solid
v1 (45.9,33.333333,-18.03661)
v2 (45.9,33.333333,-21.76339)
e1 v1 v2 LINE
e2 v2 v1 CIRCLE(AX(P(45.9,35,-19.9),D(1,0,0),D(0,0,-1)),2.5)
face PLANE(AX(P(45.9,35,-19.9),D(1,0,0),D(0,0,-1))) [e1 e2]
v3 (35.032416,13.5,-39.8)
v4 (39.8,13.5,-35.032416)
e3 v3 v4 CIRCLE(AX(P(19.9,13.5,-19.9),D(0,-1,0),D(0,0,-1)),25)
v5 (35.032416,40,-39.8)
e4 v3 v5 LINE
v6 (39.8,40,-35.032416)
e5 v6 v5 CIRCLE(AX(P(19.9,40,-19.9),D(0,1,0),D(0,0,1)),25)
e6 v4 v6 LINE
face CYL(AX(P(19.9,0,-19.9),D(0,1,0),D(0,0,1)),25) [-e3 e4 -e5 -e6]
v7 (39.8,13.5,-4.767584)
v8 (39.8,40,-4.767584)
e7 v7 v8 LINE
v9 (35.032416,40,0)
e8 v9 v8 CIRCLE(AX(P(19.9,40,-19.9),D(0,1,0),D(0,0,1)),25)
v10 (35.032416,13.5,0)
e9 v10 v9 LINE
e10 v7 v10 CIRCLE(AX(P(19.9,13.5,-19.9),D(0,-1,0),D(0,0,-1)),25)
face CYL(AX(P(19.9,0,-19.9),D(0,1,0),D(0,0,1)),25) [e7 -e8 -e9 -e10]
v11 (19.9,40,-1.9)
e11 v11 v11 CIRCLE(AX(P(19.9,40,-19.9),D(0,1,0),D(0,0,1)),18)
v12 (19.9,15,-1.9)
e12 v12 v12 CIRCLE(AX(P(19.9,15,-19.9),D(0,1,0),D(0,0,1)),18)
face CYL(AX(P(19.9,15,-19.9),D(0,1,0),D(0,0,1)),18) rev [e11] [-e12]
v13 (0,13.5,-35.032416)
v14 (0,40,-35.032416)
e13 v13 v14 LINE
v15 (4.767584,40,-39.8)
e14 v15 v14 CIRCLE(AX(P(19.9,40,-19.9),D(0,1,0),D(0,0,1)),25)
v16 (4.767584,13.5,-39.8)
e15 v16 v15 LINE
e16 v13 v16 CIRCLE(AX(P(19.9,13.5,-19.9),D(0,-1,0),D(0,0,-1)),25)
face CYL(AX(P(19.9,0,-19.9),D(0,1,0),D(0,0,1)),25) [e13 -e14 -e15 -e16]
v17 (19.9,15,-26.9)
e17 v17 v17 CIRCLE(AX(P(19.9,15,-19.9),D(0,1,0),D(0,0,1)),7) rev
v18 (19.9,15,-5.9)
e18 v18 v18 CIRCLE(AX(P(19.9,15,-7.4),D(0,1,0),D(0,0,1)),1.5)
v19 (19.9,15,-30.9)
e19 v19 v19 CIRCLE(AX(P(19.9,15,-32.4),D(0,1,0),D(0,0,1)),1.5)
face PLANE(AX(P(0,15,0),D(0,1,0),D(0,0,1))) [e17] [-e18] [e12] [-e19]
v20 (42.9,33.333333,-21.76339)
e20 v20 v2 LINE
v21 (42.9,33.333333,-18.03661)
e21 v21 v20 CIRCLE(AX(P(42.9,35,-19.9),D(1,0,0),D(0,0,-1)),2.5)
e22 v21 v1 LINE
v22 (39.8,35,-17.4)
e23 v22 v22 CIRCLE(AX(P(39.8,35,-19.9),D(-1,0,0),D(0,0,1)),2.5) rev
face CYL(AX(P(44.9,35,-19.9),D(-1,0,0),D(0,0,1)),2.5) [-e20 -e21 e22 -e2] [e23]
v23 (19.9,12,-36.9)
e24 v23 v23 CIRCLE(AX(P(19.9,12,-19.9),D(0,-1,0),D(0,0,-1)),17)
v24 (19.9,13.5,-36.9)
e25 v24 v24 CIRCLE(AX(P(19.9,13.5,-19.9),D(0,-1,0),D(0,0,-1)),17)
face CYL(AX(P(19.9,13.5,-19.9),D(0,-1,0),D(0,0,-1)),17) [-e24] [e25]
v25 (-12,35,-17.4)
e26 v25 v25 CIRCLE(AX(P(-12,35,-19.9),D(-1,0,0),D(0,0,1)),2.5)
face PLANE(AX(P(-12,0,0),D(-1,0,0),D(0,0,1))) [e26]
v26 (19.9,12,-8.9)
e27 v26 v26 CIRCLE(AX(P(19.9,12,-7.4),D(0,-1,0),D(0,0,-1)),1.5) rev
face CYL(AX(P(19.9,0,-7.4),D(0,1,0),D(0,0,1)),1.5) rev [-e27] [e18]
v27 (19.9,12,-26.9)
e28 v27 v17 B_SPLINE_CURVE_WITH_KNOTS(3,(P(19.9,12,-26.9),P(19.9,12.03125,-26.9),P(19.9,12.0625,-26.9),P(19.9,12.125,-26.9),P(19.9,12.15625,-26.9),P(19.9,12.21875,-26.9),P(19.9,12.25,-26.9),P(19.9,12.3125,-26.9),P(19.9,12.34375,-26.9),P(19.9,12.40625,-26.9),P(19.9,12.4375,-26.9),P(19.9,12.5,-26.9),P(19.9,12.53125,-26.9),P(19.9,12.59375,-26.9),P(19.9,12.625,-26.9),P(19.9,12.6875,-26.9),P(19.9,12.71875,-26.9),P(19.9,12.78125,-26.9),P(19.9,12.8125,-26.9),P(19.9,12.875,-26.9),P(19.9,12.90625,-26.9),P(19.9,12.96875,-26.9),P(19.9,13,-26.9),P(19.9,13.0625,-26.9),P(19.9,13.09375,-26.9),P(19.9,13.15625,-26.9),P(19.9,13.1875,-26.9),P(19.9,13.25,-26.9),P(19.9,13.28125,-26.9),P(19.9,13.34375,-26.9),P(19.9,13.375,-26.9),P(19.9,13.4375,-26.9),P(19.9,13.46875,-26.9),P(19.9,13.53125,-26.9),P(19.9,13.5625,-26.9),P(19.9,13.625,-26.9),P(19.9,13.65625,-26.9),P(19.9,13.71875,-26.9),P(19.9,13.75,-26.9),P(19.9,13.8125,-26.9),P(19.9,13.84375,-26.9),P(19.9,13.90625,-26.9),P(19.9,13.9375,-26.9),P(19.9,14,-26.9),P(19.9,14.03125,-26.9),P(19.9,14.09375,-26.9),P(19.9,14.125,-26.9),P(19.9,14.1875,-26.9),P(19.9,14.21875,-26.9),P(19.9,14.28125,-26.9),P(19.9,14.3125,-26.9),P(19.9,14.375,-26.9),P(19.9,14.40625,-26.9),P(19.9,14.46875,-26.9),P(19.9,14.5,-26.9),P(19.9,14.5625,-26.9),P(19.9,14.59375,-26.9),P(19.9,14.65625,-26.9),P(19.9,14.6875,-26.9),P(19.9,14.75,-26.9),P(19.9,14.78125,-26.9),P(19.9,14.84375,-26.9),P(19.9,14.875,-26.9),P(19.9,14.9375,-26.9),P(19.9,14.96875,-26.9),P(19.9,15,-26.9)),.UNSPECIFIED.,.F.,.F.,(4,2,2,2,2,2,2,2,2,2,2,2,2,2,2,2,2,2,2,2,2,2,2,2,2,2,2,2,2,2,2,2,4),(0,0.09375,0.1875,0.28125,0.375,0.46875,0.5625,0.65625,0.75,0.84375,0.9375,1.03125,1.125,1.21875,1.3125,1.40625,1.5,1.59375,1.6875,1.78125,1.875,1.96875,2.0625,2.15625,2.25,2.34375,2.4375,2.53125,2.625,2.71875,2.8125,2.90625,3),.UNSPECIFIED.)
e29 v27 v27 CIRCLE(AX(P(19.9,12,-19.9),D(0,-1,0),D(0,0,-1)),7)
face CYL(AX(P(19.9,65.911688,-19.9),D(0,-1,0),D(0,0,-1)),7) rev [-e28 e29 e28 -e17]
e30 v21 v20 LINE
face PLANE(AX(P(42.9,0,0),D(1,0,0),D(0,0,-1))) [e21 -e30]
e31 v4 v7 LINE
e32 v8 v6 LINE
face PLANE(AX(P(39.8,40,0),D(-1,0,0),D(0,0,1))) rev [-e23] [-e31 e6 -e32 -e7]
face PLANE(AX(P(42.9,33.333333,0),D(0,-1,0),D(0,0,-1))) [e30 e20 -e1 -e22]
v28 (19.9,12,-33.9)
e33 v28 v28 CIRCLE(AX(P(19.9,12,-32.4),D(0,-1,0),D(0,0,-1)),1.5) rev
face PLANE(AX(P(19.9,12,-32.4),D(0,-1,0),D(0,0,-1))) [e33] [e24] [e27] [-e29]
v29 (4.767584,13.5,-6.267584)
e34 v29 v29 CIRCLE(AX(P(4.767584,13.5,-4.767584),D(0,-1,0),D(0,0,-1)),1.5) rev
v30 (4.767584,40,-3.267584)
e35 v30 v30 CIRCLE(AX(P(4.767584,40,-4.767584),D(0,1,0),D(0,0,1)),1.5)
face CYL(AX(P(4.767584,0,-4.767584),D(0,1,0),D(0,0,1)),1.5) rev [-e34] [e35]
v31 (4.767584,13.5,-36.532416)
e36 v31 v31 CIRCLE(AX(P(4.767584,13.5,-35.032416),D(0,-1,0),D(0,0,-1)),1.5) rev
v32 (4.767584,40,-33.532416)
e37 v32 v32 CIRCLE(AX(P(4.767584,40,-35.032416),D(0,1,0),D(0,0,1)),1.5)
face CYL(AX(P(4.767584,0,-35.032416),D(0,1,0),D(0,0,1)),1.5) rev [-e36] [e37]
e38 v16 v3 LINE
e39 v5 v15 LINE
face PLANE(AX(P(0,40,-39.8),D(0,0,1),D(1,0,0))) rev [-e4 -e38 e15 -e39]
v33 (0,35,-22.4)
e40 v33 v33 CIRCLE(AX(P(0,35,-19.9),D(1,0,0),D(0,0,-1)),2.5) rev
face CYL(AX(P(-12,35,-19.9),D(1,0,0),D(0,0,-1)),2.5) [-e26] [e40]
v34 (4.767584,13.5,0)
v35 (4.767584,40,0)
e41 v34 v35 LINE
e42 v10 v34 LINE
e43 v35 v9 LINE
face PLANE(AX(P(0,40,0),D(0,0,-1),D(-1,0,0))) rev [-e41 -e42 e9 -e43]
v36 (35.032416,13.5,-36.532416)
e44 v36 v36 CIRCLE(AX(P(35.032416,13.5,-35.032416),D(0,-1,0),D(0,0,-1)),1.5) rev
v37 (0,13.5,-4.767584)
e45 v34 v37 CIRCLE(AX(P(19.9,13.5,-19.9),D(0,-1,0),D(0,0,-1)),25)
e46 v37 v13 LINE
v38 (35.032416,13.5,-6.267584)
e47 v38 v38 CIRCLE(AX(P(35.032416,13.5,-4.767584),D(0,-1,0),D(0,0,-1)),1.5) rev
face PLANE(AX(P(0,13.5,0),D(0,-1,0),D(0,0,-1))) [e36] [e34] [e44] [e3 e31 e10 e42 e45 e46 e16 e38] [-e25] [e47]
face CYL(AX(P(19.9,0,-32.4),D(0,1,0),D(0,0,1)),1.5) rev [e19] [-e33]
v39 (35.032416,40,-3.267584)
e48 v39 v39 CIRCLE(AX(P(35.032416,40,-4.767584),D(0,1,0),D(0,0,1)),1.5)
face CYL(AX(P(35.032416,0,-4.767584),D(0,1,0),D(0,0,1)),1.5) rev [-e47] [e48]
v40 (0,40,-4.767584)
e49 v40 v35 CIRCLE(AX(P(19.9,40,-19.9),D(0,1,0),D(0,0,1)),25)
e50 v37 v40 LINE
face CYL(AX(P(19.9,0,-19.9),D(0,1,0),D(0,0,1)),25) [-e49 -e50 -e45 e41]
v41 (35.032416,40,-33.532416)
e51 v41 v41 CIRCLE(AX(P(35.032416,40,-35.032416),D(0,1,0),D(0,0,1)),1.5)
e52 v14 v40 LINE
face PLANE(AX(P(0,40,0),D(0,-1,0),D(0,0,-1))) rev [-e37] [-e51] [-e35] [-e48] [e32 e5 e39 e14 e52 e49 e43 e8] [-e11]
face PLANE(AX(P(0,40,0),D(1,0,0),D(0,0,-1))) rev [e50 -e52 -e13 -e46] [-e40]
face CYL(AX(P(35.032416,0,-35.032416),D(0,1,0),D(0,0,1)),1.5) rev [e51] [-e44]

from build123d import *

# Parameters (mm, degrees)
SKETCH1_W                = 39.8
SKETCH1_H                = 39.8
BOSS_EXTRUDE1_DEPTH      = 40
CUT_EXTRUDE1_DEPTH       = 25
SKETCH3_R                = 6.5
CUT_EXTRUDE2_DEPTH       = 4.5
CUT_EXTRUDE3_DEPTH       = 64.547856
CUT_EXTRUDE3_DEPTH_BACK  = 64.547856
SKETCH4_R                = 1.585
CUT_EXTRUDE4_DEPTH       = 62.587986
CUT_EXTRUDE4_DEPTH_BACK  = 62.587986
SKETCH5_R                = 1.5
SKETCH6_R                = 2.5
BOSS_EXTRUDE2_DEPTH      = 12
BOSS_EXTRUDE3_START      = 5.1
SKETCH7_R                = 2.5
BOSS_EXTRUDE3_DEPTH      = 5.1
CUT_EXTRUDE5_DEPTH       = 73.111372
CUT_EXTRUDE6_DEPTH       = 73.111372
BOSS_EXTRUDE4_START      = 1
SKETCH10_R               = 2.5
BOSS_EXTRUDE4_DEPTH      = 1
SKETCH11_R               = 6.5
CUT_EXTRUDE7_DEPTH       = 68.535916
CUT_EXTRUDE8_START       = -12
CUT_EXTRUDE8_DEPTH       = 12
CUT_EXTRUDE9_START       = -3
SKETCH13_R               = 1.5
CUT_EXTRUDE9_DEPTH       = 3
BOSS_EXTRUDE5_DEPTH      = 1
CUT_EXTRUDE10_DEPTH      = 67.89432
CUT_EXTRUDE10_DEPTH_BACK = 67.89432
SKETCH15_R               = 1.5
CUT_EXTRUDE11_START      = -4
CUT_EXTRUDE11_DEPTH      = 4
CUT_EXTRUDE12_START      = -1
CUT_EXTRUDE12_DEPTH      = 1
BOSS_EXTRUDE6_DEPTH      = 3
BOSS_EXTRUDE7_START      = -3
BOSS_EXTRUDE7_OUTLINE_R  = 7
BOSS_EXTRUDE7_DEPTH      = 3
SKETCH20_R               = 1.5
CUT_EXTRUDE13_DEPTH      = 67.89432
CUT_EXTRUDE14_START      = -3
CUT_EXTRUDE14_DEPTH      = 3
CUT_EXTRUDE16_START      = -1.5
SKETCH22_R               = 17
SKETCH22_R_2             = 1.5
CUT_EXTRUDE16_DEPTH      = 1.5


# Read off the part's stored shape, not the designer's step: Cut-Extrude11, Boss-Extrude7, Cut-Extrude14
with BuildPart() as part:
    # Sketch1 → Boss-Extrude1 (new body)
    with BuildSketch(Plane(origin=(0, 0, 0), x_dir=(1, 0, 0), z_dir=(0, 1, 0))):
        with Locations((19.9, 19.9)):
            Rectangle(SKETCH1_W, SKETCH1_H)
    extrude(amount=BOSS_EXTRUDE1_DEPTH)

    # Sketch2 → Cut-Extrude1 (cut)
    with BuildSketch(Plane(origin=(0, 40, 0), x_dir=(1, 0, 0), z_dir=(0, 1, 0))):
        with BuildLine():
            ThreePointArc((37.9, 19.9), (32.627922, 32.627922), (19.9, 37.9))
            Line((19.9, 37.9), (19.9, 19.9))
            Line((19.9, 19.9), (37.9, 19.9))
        make_face()
        with BuildLine():
            Line((19.9, 19.9), (19.9, 37.9))
            ThreePointArc((19.9, 37.9), (7.172078, 32.627922), (1.9, 19.9))
            Line((1.9, 19.9), (19.9, 19.9))
        make_face()
        with BuildLine():
            Line((37.9, 19.9), (19.9, 19.9))
            Line((19.9, 19.9), (19.9, 1.9))
            ThreePointArc((19.9, 1.9), (32.627922, 7.172078), (37.9, 19.9))
        make_face()
        with BuildLine():
            Line((19.9, 1.9), (19.9, 19.9))
            Line((19.9, 19.9), (1.9, 19.9))
            ThreePointArc((1.9, 19.9), (7.172078, 7.172078), (19.9, 1.9))
        make_face()
        with BuildLine():
            ThreePointArc((37.9, 19.9), (32.627922, 32.627922), (19.9, 37.9))
            Line((19.9, 37.9), (19.9, 19.9))
            Line((19.9, 19.9), (37.9, 19.9))
        make_face()
        with BuildLine():
            Line((19.9, 19.9), (19.9, 37.9))
            ThreePointArc((19.9, 37.9), (7.172078, 32.627922), (1.9, 19.9))
            Line((1.9, 19.9), (19.9, 19.9))
        make_face()
        with BuildLine():
            Line((37.9, 19.9), (19.9, 19.9))
            Line((19.9, 19.9), (19.9, 1.9))
            ThreePointArc((19.9, 1.9), (32.627922, 7.172078), (37.9, 19.9))
        make_face()
        with BuildLine():
            Line((19.9, 1.9), (19.9, 19.9))
            Line((19.9, 19.9), (1.9, 19.9))
            ThreePointArc((1.9, 19.9), (7.172078, 7.172078), (19.9, 1.9))
        make_face()
        with BuildLine():
            ThreePointArc((37.9, 19.9), (32.627922, 32.627922), (19.9, 37.9))
            Line((19.9, 37.9), (19.9, 19.9))
            Line((19.9, 19.9), (37.9, 19.9))
        make_face()
        with BuildLine():
            Line((19.9, 19.9), (19.9, 37.9))
            ThreePointArc((19.9, 37.9), (7.172078, 32.627922), (1.9, 19.9))
            Line((1.9, 19.9), (19.9, 19.9))
        make_face()
        with BuildLine():
            Line((37.9, 19.9), (19.9, 19.9))
            Line((19.9, 19.9), (19.9, 1.9))
            ThreePointArc((19.9, 1.9), (32.627922, 7.172078), (37.9, 19.9))
        make_face()
        with BuildLine():
            Line((19.9, 1.9), (19.9, 19.9))
            Line((19.9, 19.9), (1.9, 19.9))
            ThreePointArc((1.9, 19.9), (7.172078, 7.172078), (19.9, 1.9))
        make_face()
        with BuildLine():
            ThreePointArc((37.9, 19.9), (32.627922, 32.627922), (19.9, 37.9))
            Line((19.9, 37.9), (19.9, 19.9))
            Line((19.9, 19.9), (37.9, 19.9))
        make_face()
        with BuildLine():
            Line((19.9, 19.9), (19.9, 37.9))
            ThreePointArc((19.9, 37.9), (7.172078, 32.627922), (1.9, 19.9))
            Line((1.9, 19.9), (19.9, 19.9))
        make_face()
        with BuildLine():
            Line((37.9, 19.9), (19.9, 19.9))
            Line((19.9, 19.9), (19.9, 1.9))
            ThreePointArc((19.9, 1.9), (32.627922, 7.172078), (37.9, 19.9))
        make_face()
        with BuildLine():
            Line((19.9, 1.9), (19.9, 19.9))
            Line((19.9, 19.9), (1.9, 19.9))
            ThreePointArc((1.9, 19.9), (7.172078, 7.172078), (19.9, 1.9))
        make_face()
    extrude(amount=-CUT_EXTRUDE1_DEPTH, mode=Mode.SUBTRACT)

    # Sketch3 → Cut-Extrude2 (cut)
    with BuildSketch(Plane(origin=(0, 15, 0), x_dir=(1, 0, 0), z_dir=(0, 1, 0))):
        with Locations(Location((19.9, 19.9, 0), (0, 0, 270))):
            Circle(SKETCH3_R)
    extrude(amount=-CUT_EXTRUDE2_DEPTH, mode=Mode.SUBTRACT)

    # Sketch4 → Cut-Extrude3 (cut, two sides: drawn at the far end of the back side and taken through both)
    with BuildSketch(Plane(origin=(0, 10.5, 0), x_dir=(1, 0, 0), z_dir=(0, 1, 0)).offset(-CUT_EXTRUDE3_DEPTH_BACK)):
        with Locations(Location((19.9, 19.9, 0), (0, 0, 270))):
            Circle(SKETCH4_R)
    extrude(amount=CUT_EXTRUDE3_DEPTH + CUT_EXTRUDE3_DEPTH_BACK, mode=Mode.SUBTRACT)

    # Sketch5 → Cut-Extrude4 (cut, two sides: drawn at the far end of the back side and taken through both)
    with BuildSketch(Plane(origin=(0, 15, 0), x_dir=(1, 0, 0), z_dir=(0, 1, 0)).offset(-CUT_EXTRUDE4_DEPTH_BACK)):
        with Locations(Location((7.4, 19.9, 0), (0, 0, 270))):
            Circle(SKETCH5_R)
        with Locations(Location((32.4, 19.9, 0), (0, 0, 270))):
            Circle(SKETCH5_R)
        with Locations(Location((19.9, 7.4, 0), (0, 0, 270))):
            Circle(SKETCH5_R)
        with Locations(Location((19.9, 32.4, 0), (0, 0, 270))):
            Circle(SKETCH5_R)
    extrude(amount=CUT_EXTRUDE4_DEPTH + CUT_EXTRUDE4_DEPTH_BACK, mode=Mode.SUBTRACT)

    # Sketch6 → Boss-Extrude2 (add)
    with BuildSketch(Plane.ZY):
        with Locations(Location((-19.9, 35, 0), (0, 0, 180))):
            Circle(SKETCH6_R)
    extrude(amount=BOSS_EXTRUDE2_DEPTH)

    # Sketch7 → Boss-Extrude3 (add)
    with BuildSketch(Plane(origin=(39.8, 0, 0), x_dir=(0, 0, -1), z_dir=(1, 0, 0)).offset(BOSS_EXTRUDE3_START)):
        with Locations((19.9, 35)):
            Circle(SKETCH7_R)
    extrude(amount=-BOSS_EXTRUDE3_DEPTH)

    # Sketch8 → Cut-Extrude5 (cut, through all)
    with BuildSketch(Plane(origin=(0, 40, 0), x_dir=(1, 0, 0), z_dir=(0, 1, 0))):
        with BuildLine():
            Line((39.8, 39.8), (35.032416, 39.8))
            ThreePointArc((35.032416, 39.8), (37.57767, 37.57767), (39.8, 35.032416))
            Line((39.8, 35.032416), (39.8, 39.8))
        make_face()
        with BuildLine():
            Line((4.767584, 39.8), (0, 39.8))
            Line((0, 39.8), (0, 35.032416))
            ThreePointArc((0, 35.032416), (2.22233, 37.57767), (4.767584, 39.8))
        make_face()
        with BuildLine():
            ThreePointArc((4.767584, 0), (2.22233, 2.22233), (0, 4.767584))
            Line((0, 4.767584), (0, 0))
            Line((0, 0), (4.767584, 0))
        make_face()
        with BuildLine():
            Line((39.8, 0), (39.8, 4.767584))
            ThreePointArc((39.8, 4.767584), (37.57767, 2.22233), (35.032416, 0))
            Line((35.032416, 0), (39.8, 0))
        make_face()
    extrude(amount=-CUT_EXTRUDE5_DEPTH, mode=Mode.SUBTRACT)

    # Sketch9 → Cut-Extrude6 (cut, through all)
    with BuildSketch(Plane(origin=(0, 40, 0), x_dir=(1, 0, 0), z_dir=(0, 1, 0))):
        with BuildLine():
            ThreePointArc((35.032416, 6.267584), (33.971755, 5.828245), (33.532416, 4.767584))
            Line((33.532416, 4.767584), (35.032416, 4.767584))
            Line((35.032416, 4.767584), (35.032416, 6.267584))
        make_face()
        with BuildLine():
            Line((35.032416, 4.767584), (33.532416, 4.767584))
            ThreePointArc((33.532416, 4.767584), (33.971755, 3.706924), (35.032416, 3.267584))
            Line((35.032416, 3.267584), (35.032416, 4.767584))
        make_face()
        with BuildLine():
            Line((35.032416, 6.267584), (35.032416, 4.767584))
            Line((35.032416, 4.767584), (36.532416, 4.767584))
            ThreePointArc((36.532416, 4.767584), (36.093076, 5.828245), (35.032416, 6.267584))
        make_face()
        with BuildLine():
            Line((36.532416, 4.767584), (35.032416, 4.767584))
            Line((35.032416, 4.767584), (35.032416, 3.267584))
            ThreePointArc((35.032416, 3.267584), (36.093076, 3.706924), (36.532416, 4.767584))
        make_face()
        with BuildLine():
            ThreePointArc((35.032416, 6.267584), (33.971755, 5.828245), (33.532416, 4.767584))
            Line((33.532416, 4.767584), (35.032416, 4.767584))
            Line((35.032416, 4.767584), (35.032416, 6.267584))
        make_face()
        with BuildLine():
            Line((35.032416, 4.767584), (33.532416, 4.767584))
            ThreePointArc((33.532416, 4.767584), (33.971755, 3.706924), (35.032416, 3.267584))
            Line((35.032416, 3.267584), (35.032416, 4.767584))
        make_face()
        with BuildLine():
            Line((35.032416, 6.267584), (35.032416, 4.767584))
            Line((35.032416, 4.767584), (36.532416, 4.767584))
            ThreePointArc((36.532416, 4.767584), (36.093076, 5.828245), (35.032416, 6.267584))
        make_face()
        with BuildLine():
            Line((36.532416, 4.767584), (35.032416, 4.767584))
            Line((35.032416, 4.767584), (35.032416, 3.267584))
            ThreePointArc((35.032416, 3.267584), (36.093076, 3.706924), (36.532416, 4.767584))
        make_face()
        with BuildLine():
            ThreePointArc((35.032416, 6.267584), (33.971755, 5.828245), (33.532416, 4.767584))
            Line((33.532416, 4.767584), (35.032416, 4.767584))
            Line((35.032416, 4.767584), (35.032416, 6.267584))
        make_face()
        with BuildLine():
            Line((35.032416, 4.767584), (33.532416, 4.767584))
            ThreePointArc((33.532416, 4.767584), (33.971755, 3.706924), (35.032416, 3.267584))
            Line((35.032416, 3.267584), (35.032416, 4.767584))
        make_face()
        with BuildLine():
            Line((35.032416, 6.267584), (35.032416, 4.767584))
            Line((35.032416, 4.767584), (36.532416, 4.767584))
            ThreePointArc((36.532416, 4.767584), (36.093076, 5.828245), (35.032416, 6.267584))
        make_face()
        with BuildLine():
            Line((36.532416, 4.767584), (35.032416, 4.767584))
            Line((35.032416, 4.767584), (35.032416, 3.267584))
            ThreePointArc((35.032416, 3.267584), (36.093076, 3.706924), (36.532416, 4.767584))
        make_face()
        with BuildLine():
            ThreePointArc((35.032416, 6.267584), (33.971755, 5.828245), (33.532416, 4.767584))
            Line((33.532416, 4.767584), (35.032416, 4.767584))
            Line((35.032416, 4.767584), (35.032416, 6.267584))
        make_face()
        with BuildLine():
            Line((35.032416, 4.767584), (33.532416, 4.767584))
            ThreePointArc((33.532416, 4.767584), (33.971755, 3.706924), (35.032416, 3.267584))
            Line((35.032416, 3.267584), (35.032416, 4.767584))
        make_face()
        with BuildLine():
            Line((35.032416, 6.267584), (35.032416, 4.767584))
            Line((35.032416, 4.767584), (36.532416, 4.767584))
            ThreePointArc((36.532416, 4.767584), (36.093076, 5.828245), (35.032416, 6.267584))
        make_face()
        with BuildLine():
            Line((36.532416, 4.767584), (35.032416, 4.767584))
            Line((35.032416, 4.767584), (35.032416, 3.267584))
            ThreePointArc((35.032416, 3.267584), (36.093076, 3.706924), (36.532416, 4.767584))
        make_face()
        with BuildLine():
            ThreePointArc((4.767584, 6.267584), (3.706924, 5.828245), (3.267584, 4.767584))
            Line((3.267584, 4.767584), (4.767584, 4.767584))
            Line((4.767584, 4.767584), (4.767584, 6.267584))
        make_face()
        with BuildLine():
            Line((4.767584, 4.767584), (3.267584, 4.767584))
            ThreePointArc((3.267584, 4.767584), (3.706924, 3.706924), (4.767584, 3.267584))
            Line((4.767584, 3.267584), (4.767584, 4.767584))
        make_face()
        with BuildLine():
            Line((4.767584, 6.267584), (4.767584, 4.767584))
            Line((4.767584, 4.767584), (6.267584, 4.767584))
            ThreePointArc((6.267584, 4.767584), (5.828245, 5.828245), (4.767584, 6.267584))
        make_face()
        with BuildLine():
            Line((6.267584, 4.767584), (4.767584, 4.767584))
            Line((4.767584, 4.767584), (4.767584, 3.267584))
            ThreePointArc((4.767584, 3.267584), (5.828245, 3.706924), (6.267584, 4.767584))
        make_face()
        with BuildLine():
            ThreePointArc((4.767584, 6.267584), (3.706924, 5.828245), (3.267584, 4.767584))
            Line((3.267584, 4.767584), (4.767584, 4.767584))
            Line((4.767584, 4.767584), (4.767584, 6.267584))
        make_face()
        with BuildLine():
            Line((4.767584, 4.767584), (3.267584, 4.767584))
            ThreePointArc((3.267584, 4.767584), (3.706924, 3.706924), (4.767584, 3.267584))
            Line((4.767584, 3.267584), (4.767584, 4.767584))
        make_face()
        with BuildLine():
            Line((4.767584, 6.267584), (4.767584, 4.767584))
            Line((4.767584, 4.767584), (6.267584, 4.767584))
            ThreePointArc((6.267584, 4.767584), (5.828245, 5.828245), (4.767584, 6.267584))
        make_face()
        with BuildLine():
            Line((6.267584, 4.767584), (4.767584, 4.767584))
            Line((4.767584, 4.767584), (4.767584, 3.267584))
            ThreePointArc((4.767584, 3.267584), (5.828245, 3.706924), (6.267584, 4.767584))
        make_face()
        with BuildLine():
            ThreePointArc((4.767584, 6.267584), (3.706924, 5.828245), (3.267584, 4.767584))
            Line((3.267584, 4.767584), (4.767584, 4.767584))
            Line((4.767584, 4.767584), (4.767584, 6.267584))
        make_face()
        with BuildLine():
            Line((4.767584, 4.767584), (3.267584, 4.767584))
            ThreePointArc((3.267584, 4.767584), (3.706924, 3.706924), (4.767584, 3.267584))
            Line((4.767584, 3.267584), (4.767584, 4.767584))
        make_face()
        with BuildLine():
            Line((4.767584, 6.267584), (4.767584, 4.767584))
            Line((4.767584, 4.767584), (6.267584, 4.767584))
            ThreePointArc((6.267584, 4.767584), (5.828245, 5.828245), (4.767584, 6.267584))
        make_face()
        with BuildLine():
            Line((6.267584, 4.767584), (4.767584, 4.767584))
            Line((4.767584, 4.767584), (4.767584, 3.267584))
            ThreePointArc((4.767584, 3.267584), (5.828245, 3.706924), (6.267584, 4.767584))
        make_face()
        with BuildLine():
            ThreePointArc((4.767584, 6.267584), (3.706924, 5.828245), (3.267584, 4.767584))
            Line((3.267584, 4.767584), (4.767584, 4.767584))
            Line((4.767584, 4.767584), (4.767584, 6.267584))
        make_face()
        with BuildLine():
            Line((4.767584, 4.767584), (3.267584, 4.767584))
            ThreePointArc((3.267584, 4.767584), (3.706924, 3.706924), (4.767584, 3.267584))
            Line((4.767584, 3.267584), (4.767584, 4.767584))
        make_face()
        with BuildLine():
            Line((4.767584, 6.267584), (4.767584, 4.767584))
            Line((4.767584, 4.767584), (6.267584, 4.767584))
            ThreePointArc((6.267584, 4.767584), (5.828245, 5.828245), (4.767584, 6.267584))
        make_face()
        with BuildLine():
            Line((6.267584, 4.767584), (4.767584, 4.767584))
            Line((4.767584, 4.767584), (4.767584, 3.267584))
            ThreePointArc((4.767584, 3.267584), (5.828245, 3.706924), (6.267584, 4.767584))
        make_face()
        with BuildLine():
            ThreePointArc((3.267584, 35.032416), (3.706924, 33.971755), (4.767584, 33.532416))
            Line((4.767584, 33.532416), (4.767584, 35.032416))
            Line((4.767584, 35.032416), (3.267584, 35.032416))
        make_face()
        with BuildLine():
            Line((4.767584, 35.032416), (4.767584, 33.532416))
            ThreePointArc((4.767584, 33.532416), (5.828245, 33.971755), (6.267584, 35.032416))
            Line((6.267584, 35.032416), (4.767584, 35.032416))
        make_face()
        with BuildLine():
            Line((3.267584, 35.032416), (4.767584, 35.032416))
            Line((4.767584, 35.032416), (4.767584, 36.532416))
            ThreePointArc((4.767584, 36.532416), (3.706924, 36.093076), (3.267584, 35.032416))
        make_face()
        with BuildLine():
            Line((4.767584, 36.532416), (4.767584, 35.032416))
            Line((4.767584, 35.032416), (6.267584, 35.032416))
            ThreePointArc((6.267584, 35.032416), (5.828245, 36.093076), (4.767584, 36.532416))
        make_face()
        with BuildLine():
            ThreePointArc((3.267584, 35.032416), (3.706924, 33.971755), (4.767584, 33.532416))
            Line((4.767584, 33.532416), (4.767584, 35.032416))
            Line((4.767584, 35.032416), (3.267584, 35.032416))
        make_face()
        with BuildLine():
            Line((4.767584, 35.032416), (4.767584, 33.532416))
            ThreePointArc((4.767584, 33.532416), (5.828245, 33.971755), (6.267584, 35.032416))
            Line((6.267584, 35.032416), (4.767584, 35.032416))
        make_face()
        with BuildLine():
            Line((3.267584, 35.032416), (4.767584, 35.032416))
            Line((4.767584, 35.032416), (4.767584, 36.532416))
            ThreePointArc((4.767584, 36.532416), (3.706924, 36.093076), (3.267584, 35.032416))
        make_face()
        with BuildLine():
            Line((4.767584, 36.532416), (4.767584, 35.032416))
            Line((4.767584, 35.032416), (6.267584, 35.032416))
            ThreePointArc((6.267584, 35.032416), (5.828245, 36.093076), (4.767584, 36.532416))
        make_face()
        with BuildLine():
            ThreePointArc((3.267584, 35.032416), (3.706924, 33.971755), (4.767584, 33.532416))
            Line((4.767584, 33.532416), (4.767584, 35.032416))
            Line((4.767584, 35.032416), (3.267584, 35.032416))
        make_face()
        with BuildLine():
            Line((4.767584, 35.032416), (4.767584, 33.532416))
            ThreePointArc((4.767584, 33.532416), (5.828245, 33.971755), (6.267584, 35.032416))
            Line((6.267584, 35.032416), (4.767584, 35.032416))
        make_face()
        with BuildLine():
            Line((3.267584, 35.032416), (4.767584, 35.032416))
            Line((4.767584, 35.032416), (4.767584, 36.532416))
            ThreePointArc((4.767584, 36.532416), (3.706924, 36.093076), (3.267584, 35.032416))
        make_face()
        with BuildLine():
            Line((4.767584, 36.532416), (4.767584, 35.032416))
            Line((4.767584, 35.032416), (6.267584, 35.032416))
            ThreePointArc((6.267584, 35.032416), (5.828245, 36.093076), (4.767584, 36.532416))
        make_face()
        with BuildLine():
            ThreePointArc((3.267584, 35.032416), (3.706924, 33.971755), (4.767584, 33.532416))
            Line((4.767584, 33.532416), (4.767584, 35.032416))
            Line((4.767584, 35.032416), (3.267584, 35.032416))
        make_face()
        with BuildLine():
            Line((4.767584, 35.032416), (4.767584, 33.532416))
            ThreePointArc((4.767584, 33.532416), (5.828245, 33.971755), (6.267584, 35.032416))
            Line((6.267584, 35.032416), (4.767584, 35.032416))
        make_face()
        with BuildLine():
            Line((3.267584, 35.032416), (4.767584, 35.032416))
            Line((4.767584, 35.032416), (4.767584, 36.532416))
            ThreePointArc((4.767584, 36.532416), (3.706924, 36.093076), (3.267584, 35.032416))
        make_face()
        with BuildLine():
            Line((4.767584, 36.532416), (4.767584, 35.032416))
            Line((4.767584, 35.032416), (6.267584, 35.032416))
            ThreePointArc((6.267584, 35.032416), (5.828245, 36.093076), (4.767584, 36.532416))
        make_face()
        with BuildLine():
            ThreePointArc((35.032416, 36.532416), (33.971755, 36.093076), (33.532416, 35.032416))
            Line((33.532416, 35.032416), (35.032416, 35.032416))
            Line((35.032416, 35.032416), (35.032416, 36.532416))
        make_face()
        with BuildLine():
            Line((35.032416, 35.032416), (33.532416, 35.032416))
            ThreePointArc((33.532416, 35.032416), (33.971755, 33.971755), (35.032416, 33.532416))
            Line((35.032416, 33.532416), (35.032416, 35.032416))
        make_face()
        with BuildLine():
            Line((35.032416, 35.032416), (35.032416, 33.532416))
            ThreePointArc((35.032416, 33.532416), (36.093076, 33.971755), (36.532416, 35.032416))
            Line((36.532416, 35.032416), (35.032416, 35.032416))
        make_face()
        with BuildLine():
            Line((35.032416, 36.532416), (35.032416, 35.032416))
            Line((35.032416, 35.032416), (36.532416, 35.032416))
            ThreePointArc((36.532416, 35.032416), (36.093076, 36.093076), (35.032416, 36.532416))
        make_face()
        with BuildLine():
            ThreePointArc((35.032416, 36.532416), (33.971755, 36.093076), (33.532416, 35.032416))
            Line((33.532416, 35.032416), (35.032416, 35.032416))
            Line((35.032416, 35.032416), (35.032416, 36.532416))
        make_face()
        with BuildLine():
            Line((35.032416, 35.032416), (33.532416, 35.032416))
            ThreePointArc((33.532416, 35.032416), (33.971755, 33.971755), (35.032416, 33.532416))
            Line((35.032416, 33.532416), (35.032416, 35.032416))
        make_face()
        with BuildLine():
            Line((35.032416, 35.032416), (35.032416, 33.532416))
            ThreePointArc((35.032416, 33.532416), (36.093076, 33.971755), (36.532416, 35.032416))
            Line((36.532416, 35.032416), (35.032416, 35.032416))
        make_face()
        with BuildLine():
            Line((35.032416, 36.532416), (35.032416, 35.032416))
            Line((35.032416, 35.032416), (36.532416, 35.032416))
            ThreePointArc((36.532416, 35.032416), (36.093076, 36.093076), (35.032416, 36.532416))
        make_face()
        with BuildLine():
            ThreePointArc((35.032416, 36.532416), (33.971755, 36.093076), (33.532416, 35.032416))
            Line((33.532416, 35.032416), (35.032416, 35.032416))
            Line((35.032416, 35.032416), (35.032416, 36.532416))
        make_face()
        with BuildLine():
            Line((35.032416, 35.032416), (33.532416, 35.032416))
            ThreePointArc((33.532416, 35.032416), (33.971755, 33.971755), (35.032416, 33.532416))
            Line((35.032416, 33.532416), (35.032416, 35.032416))
        make_face()
        with BuildLine():
            Line((35.032416, 35.032416), (35.032416, 33.532416))
            ThreePointArc((35.032416, 33.532416), (36.093076, 33.971755), (36.532416, 35.032416))
            Line((36.532416, 35.032416), (35.032416, 35.032416))
        make_face()
        with BuildLine():
            Line((35.032416, 36.532416), (35.032416, 35.032416))
            Line((35.032416, 35.032416), (36.532416, 35.032416))
            ThreePointArc((36.532416, 35.032416), (36.093076, 36.093076), (35.032416, 36.532416))
        make_face()
        with BuildLine():
            ThreePointArc((35.032416, 36.532416), (33.971755, 36.093076), (33.532416, 35.032416))
            Line((33.532416, 35.032416), (35.032416, 35.032416))
            Line((35.032416, 35.032416), (35.032416, 36.532416))
        make_face()
        with BuildLine():
            Line((35.032416, 35.032416), (33.532416, 35.032416))
            ThreePointArc((33.532416, 35.032416), (33.971755, 33.971755), (35.032416, 33.532416))
            Line((35.032416, 33.532416), (35.032416, 35.032416))
        make_face()
        with BuildLine():
            Line((35.032416, 35.032416), (35.032416, 33.532416))
            ThreePointArc((35.032416, 33.532416), (36.093076, 33.971755), (36.532416, 35.032416))
            Line((36.532416, 35.032416), (35.032416, 35.032416))
        make_face()
        with BuildLine():
            Line((35.032416, 36.532416), (35.032416, 35.032416))
            Line((35.032416, 35.032416), (36.532416, 35.032416))
            ThreePointArc((36.532416, 35.032416), (36.093076, 36.093076), (35.032416, 36.532416))
        make_face()
    extrude(amount=-CUT_EXTRUDE6_DEPTH, mode=Mode.SUBTRACT)

    # Sketch10 → Boss-Extrude4 (add)
    with BuildSketch(Plane(origin=(44.9, 0, 0), x_dir=(0, 0, -1), z_dir=(1, 0, 0)).offset(BOSS_EXTRUDE4_START)):
        with Locations((19.9, 35)):
            Circle(SKETCH10_R)
    extrude(amount=-BOSS_EXTRUDE4_DEPTH)

    # Sketch11 → Cut-Extrude7 (cut, through all)
    with BuildSketch(Plane(origin=(0, 10.5, 0), x_dir=(1, 0, 0), z_dir=(0, 1, 0))):
        with Locations(Location((19.9, 19.9, 0), (0, 0, 270))):
            Circle(SKETCH11_R)
    extrude(amount=-CUT_EXTRUDE7_DEPTH, mode=Mode.SUBTRACT)

    # Sketch12 → Cut-Extrude8 (cut)
    with BuildSketch(Plane.XZ.offset(CUT_EXTRUDE8_START)):
        with BuildLine():
            Line((0, -4.767584), (0, -35.032416))
            ThreePointArc((0, -35.032416), (2.22233, -37.57767), (4.767584, -39.8))
            Line((4.767584, -39.8), (35.032416, -39.8))
            ThreePointArc((35.032416, -39.8), (37.57767, -37.57767), (39.8, -35.032416))
            Line((39.8, -35.032416), (39.8, -4.767584))
            ThreePointArc((39.8, -4.767584), (37.57767, -2.22233), (35.032416, 0))
            Line((35.032416, 0), (4.767584, 0))
            ThreePointArc((4.767584, 0), (2.22233, -2.22233), (0, -4.767584))
        make_face()
    extrude(amount=CUT_EXTRUDE8_DEPTH, mode=Mode.SUBTRACT)

    # Sketch13 → Cut-Extrude9 (cut)
    # profile 1 of 2: a face of its own
    with BuildSketch(Plane.XZ.offset(-12).offset(CUT_EXTRUDE9_START)):
        with BuildLine():
            ThreePointArc((19.9, -26.4), (24.142641, -28.157359), (25.9, -32.4))
            Line((25.9, -32.4), (25.9, -39.8))
            Line((25.9, -39.8), (35.032416, -39.8))
            ThreePointArc((35.032416, -39.8), (37.57767, -37.57767), (39.8, -35.032416))
            Line((39.8, -35.032416), (39.8, -4.767584))
            ThreePointArc((39.8, -4.767584), (37.57767, -2.22233), (35.032416, 0))
            Line((35.032416, 0), (25.9, 0))
            Line((25.9, 0), (25.9, -7.4))
            ThreePointArc((25.9, -7.4), (24.142641, -11.642641), (19.9, -13.4))
            ThreePointArc((19.9, -13.4), (24.496194, -15.303806), (26.4, -19.9))
            ThreePointArc((26.4, -19.9), (24.496194, -24.496194), (19.9, -26.4))
        make_face()
        with Locations(Location((35.032416, -35.032416, 0), (0, 0, 90))):
            Circle(SKETCH13_R, mode=Mode.SUBTRACT)
        with Locations((32.4, -19.9)):
            Circle(SKETCH13_R, mode=Mode.SUBTRACT)
        with Locations(Location((35.032416, -4.767584, 0), (0, 0, 90))):
            Circle(SKETCH13_R, mode=Mode.SUBTRACT)
    # profile 2 of 2: a face of its own
    with BuildSketch(Plane.XZ.offset(-12).offset(CUT_EXTRUDE9_START)):
        with BuildLine():
            Line((13.9, -39.8), (13.9, -32.4))
            ThreePointArc((13.9, -32.4), (15.657359, -28.157359), (19.9, -26.4))
            ThreePointArc((19.9, -26.4), (13.4, -19.9), (19.9, -13.4))
            ThreePointArc((19.9, -13.4), (15.657359, -11.642641), (13.9, -7.4))
            Line((13.9, -7.4), (13.9, 0))
            Line((13.9, 0), (4.767584, 0))
            ThreePointArc((4.767584, 0), (2.22233, -2.22233), (0, -4.767584))
            Line((0, -4.767584), (0, -35.032416))
            ThreePointArc((0, -35.032416), (2.22233, -37.57767), (4.767584, -39.8))
            Line((4.767584, -39.8), (13.9, -39.8))
        make_face()
        with Locations(Location((4.767584, -35.032416, 0), (0, 0, 90))):
            Circle(SKETCH13_R, mode=Mode.SUBTRACT)
        with Locations((7.4, -19.9)):
            Circle(SKETCH13_R, mode=Mode.SUBTRACT)
        with Locations(Location((4.767584, -4.767584, 0), (0, 0, 90))):
            Circle(SKETCH13_R, mode=Mode.SUBTRACT)
    extrude(amount=CUT_EXTRUDE9_DEPTH, mode=Mode.SUBTRACT)

    # Sketch14 → Boss-Extrude5 (add)
    with BuildSketch(Plane.XZ.offset(-12)):
        with BuildLine():
            Line((13.9, -32.4), (13.9, -39.8))
            Line((13.9, -39.8), (25.9, -39.8))
            Line((25.9, -39.8), (25.9, -32.4))
            ThreePointArc((25.9, -32.4), (19.9, -26.4), (13.9, -32.4))
        make_face()
        with BuildLine():
            Line((25.9, 0), (13.9, 0))
            Line((13.9, 0), (13.9, -7.4))
            ThreePointArc((13.9, -7.4), (19.9, -13.4), (25.9, -7.4))
            Line((25.9, -7.4), (25.9, 0))
        make_face()
    extrude(amount=BOSS_EXTRUDE5_DEPTH)

    # Sketch15 → Cut-Extrude10 (cut, two sides: drawn at the far end of the back side and taken through both)
    with BuildSketch(Plane(origin=(0, 12, 0), x_dir=(1, 0, 0), z_dir=(0, 1, 0)).offset(-CUT_EXTRUDE10_DEPTH_BACK)):
        with Locations(Location((19.9, 7.4, 0), (0, 0, 270))):
            Circle(SKETCH15_R)
        with Locations(Location((19.9, 32.4, 0), (0, 0, 270))):
            Circle(SKETCH15_R)
    extrude(amount=CUT_EXTRUDE10_DEPTH + CUT_EXTRUDE10_DEPTH_BACK, mode=Mode.SUBTRACT)

    # Cut-Extrude11 outline → Cut-Extrude11 (cut)
    with BuildSketch(Plane.XZ.offset(-11).offset(CUT_EXTRUDE11_START)):
        with BuildLine():
            Line((23.216625, -12.4), (16.583375, -12.4))
            ThreePointArc((16.583375, -12.4), (19.9, -13.4), (23.216625, -12.4))
        make_face()
        with BuildLine():
            ThreePointArc((23.216625, -27.4), (19.9, -26.4), (16.583375, -27.4))
            Line((16.583375, -27.4), (23.216625, -27.4))
        make_face()
    extrude(amount=CUT_EXTRUDE11_DEPTH, mode=Mode.SUBTRACT)

    # Sketch17 → Cut-Extrude12 (cut)
    with BuildSketch(Plane.XZ.offset(-11).offset(CUT_EXTRUDE12_START)):
        with BuildLine():
            Line((23.216625, -27.4), (16.583375, -27.4))
            ThreePointArc((16.583375, -27.4), (14.613236, -29.562726), (13.9, -32.4))
            Line((13.9, -32.4), (13.9, -39.8))
            Line((13.9, -39.8), (25.9, -39.8))
            Line((25.9, -39.8), (25.9, -32.4))
            ThreePointArc((25.9, -32.4), (25.186764, -29.562726), (23.216625, -27.4))
        make_face()
        with BuildLine():
            Line((16.583375, -12.4), (23.216625, -12.4))
            ThreePointArc((23.216625, -12.4), (25.186764, -10.237274), (25.9, -7.4))
            Line((25.9, -7.4), (25.9, 0))
            Line((25.9, 0), (13.9, 0))
            Line((13.9, 0), (13.9, -7.4))
            ThreePointArc((13.9, -7.4), (14.613236, -10.237274), (16.583375, -12.4))
        make_face()
    extrude(amount=CUT_EXTRUDE12_DEPTH, mode=Mode.SUBTRACT)

    # Sketch18 → Boss-Extrude6 (add)
    with BuildSketch(Plane.XZ.offset(-15)):
        with BuildLine():
            Line((13.9, -2.929437), (13.9, 0))
            Line((13.9, 0), (4.767584, 0))
            ThreePointArc((4.767584, 0), (2.22233, -2.22233), (0, -4.767584))
            Line((0, -4.767584), (0, -35.032416))
            ThreePointArc((0, -35.032416), (2.22233, -37.57767), (4.767584, -39.8))
            Line((4.767584, -39.8), (13.9, -39.8))
            Line((13.9, -39.8), (13.9, -36.870563))
            ThreePointArc((13.9, -36.870563), (1.9, -19.9), (13.9, -2.929437))
        make_face()
        with BuildLine():
            Line((25.9, -36.870563), (25.9, -39.8))
            Line((25.9, -39.8), (35.032416, -39.8))
            ThreePointArc((35.032416, -39.8), (37.57767, -37.57767), (39.8, -35.032416))
            Line((39.8, -35.032416), (39.8, -4.767584))
            ThreePointArc((39.8, -4.767584), (37.57767, -2.22233), (35.032416, 0))
            Line((35.032416, 0), (25.9, 0))
            Line((25.9, 0), (25.9, -2.929437))
            ThreePointArc((25.9, -2.929437), (37.9, -19.9), (25.9, -36.870563))
        make_face()
    extrude(amount=BOSS_EXTRUDE6_DEPTH)

    # Boss-Extrude7 outline → Boss-Extrude7 (add)
    with BuildSketch(Plane.XZ.offset(-12).offset(BOSS_EXTRUDE7_START)):
        with BuildLine():
            Line((25.9, -2.929437), (25.9, -7.4))
            ThreePointArc((25.9, -7.4), (25.186764, -10.237274), (23.216625, -12.4))
            Line((23.216625, -12.4), (16.583375, -12.4))
            ThreePointArc((16.583375, -12.4), (14.613236, -10.237274), (13.9, -7.4))
            Line((13.9, -7.4), (13.9, -2.929437))
            ThreePointArc((13.9, -2.929437), (1.9, -19.9), (13.9, -36.870563))
            Line((13.9, -36.870563), (13.9, -32.4))
            ThreePointArc((13.9, -32.4), (14.613236, -29.562726), (16.583375, -27.4))
            Line((16.583375, -27.4), (23.216625, -27.4))
            ThreePointArc((23.216625, -27.4), (25.186764, -29.562726), (25.9, -32.4))
            Line((25.9, -32.4), (25.9, -36.870563))
            ThreePointArc((25.9, -36.870563), (37.9, -19.9), (25.9, -2.929437))
        make_face()
        with Locations((19.9, -19.9)):
            Circle(BOSS_EXTRUDE7_OUTLINE_R, mode=Mode.SUBTRACT)
    extrude(amount=BOSS_EXTRUDE7_DEPTH)

    # Sketch20 → Cut-Extrude13 (cut, through all)
    with BuildSketch(Plane(origin=(0, 40, 0), x_dir=(1, 0, 0), z_dir=(0, 1, 0))):
        with Locations(Location((4.767584, 35.032416, 0), (0, 0, 270))):
            Circle(SKETCH20_R)
        with Locations(Location((35.032416, 4.767584, 0), (0, 0, 270))):
            Circle(SKETCH20_R)
        with Locations(Location((35.032416, 35.032416, 0), (0, 0, 270))):
            Circle(SKETCH20_R)
        with Locations(Location((4.767584, 4.767584, 0), (0, 0, 270))):
            Circle(SKETCH20_R)
    extrude(amount=-CUT_EXTRUDE13_DEPTH, mode=Mode.SUBTRACT)

    # Cut-Extrude14 outline → Cut-Extrude14 (cut)
    with BuildSketch(Plane(origin=(45.9, 0, 0), x_dir=(0, 0, -1), z_dir=(1, 0, 0)).offset(CUT_EXTRUDE14_START)):
        with BuildLine():
            Line((21.76339, 33.333333), (18.03661, 33.333333))
            ThreePointArc((18.03661, 33.333333), (19.9, 32.5), (21.76339, 33.333333))
        make_face()
    extrude(amount=CUT_EXTRUDE14_DEPTH, mode=Mode.SUBTRACT)

    # Sketch22 → Cut-Extrude16 (cut)
    with BuildSketch(Plane.XZ.offset(-12).offset(CUT_EXTRUDE16_START)):
        with BuildLine():
            ThreePointArc((0, -35.032416), (2.22233, -37.57767), (4.767584, -39.8))
            Line((4.767584, -39.8), (35.032416, -39.8))
            ThreePointArc((35.032416, -39.8), (37.57767, -37.57767), (39.8, -35.032416))
            Line((39.8, -35.032416), (39.8, -4.767584))
            ThreePointArc((39.8, -4.767584), (37.57767, -2.22233), (35.032416, 0))
            Line((35.032416, 0), (4.767584, 0))
            ThreePointArc((4.767584, 0), (2.22233, -2.22233), (0, -4.767584))
            Line((0, -4.767584), (0, -35.032416))
        make_face()
        with Locations(Location((19.9, -19.9, 0), (0, 0, 270))):
            Circle(SKETCH22_R, mode=Mode.SUBTRACT)
        with Locations(Location((35.032416, -35.032416, 0), (0, 0, 90))):
            Circle(SKETCH22_R_2, mode=Mode.SUBTRACT)
        with Locations(Location((4.767584, -35.032416, 0), (0, 0, 90))):
            Circle(SKETCH22_R_2, mode=Mode.SUBTRACT)
        with Locations(Location((35.032416, -4.767584, 0), (0, 0, 90))):
            Circle(SKETCH22_R_2, mode=Mode.SUBTRACT)
        with Locations(Location((4.767584, -4.767584, 0), (0, 0, 90))):
            Circle(SKETCH22_R_2, mode=Mode.SUBTRACT)
    extrude(amount=CUT_EXTRUDE16_DEPTH, mode=Mode.SUBTRACT)


solid = part.part
